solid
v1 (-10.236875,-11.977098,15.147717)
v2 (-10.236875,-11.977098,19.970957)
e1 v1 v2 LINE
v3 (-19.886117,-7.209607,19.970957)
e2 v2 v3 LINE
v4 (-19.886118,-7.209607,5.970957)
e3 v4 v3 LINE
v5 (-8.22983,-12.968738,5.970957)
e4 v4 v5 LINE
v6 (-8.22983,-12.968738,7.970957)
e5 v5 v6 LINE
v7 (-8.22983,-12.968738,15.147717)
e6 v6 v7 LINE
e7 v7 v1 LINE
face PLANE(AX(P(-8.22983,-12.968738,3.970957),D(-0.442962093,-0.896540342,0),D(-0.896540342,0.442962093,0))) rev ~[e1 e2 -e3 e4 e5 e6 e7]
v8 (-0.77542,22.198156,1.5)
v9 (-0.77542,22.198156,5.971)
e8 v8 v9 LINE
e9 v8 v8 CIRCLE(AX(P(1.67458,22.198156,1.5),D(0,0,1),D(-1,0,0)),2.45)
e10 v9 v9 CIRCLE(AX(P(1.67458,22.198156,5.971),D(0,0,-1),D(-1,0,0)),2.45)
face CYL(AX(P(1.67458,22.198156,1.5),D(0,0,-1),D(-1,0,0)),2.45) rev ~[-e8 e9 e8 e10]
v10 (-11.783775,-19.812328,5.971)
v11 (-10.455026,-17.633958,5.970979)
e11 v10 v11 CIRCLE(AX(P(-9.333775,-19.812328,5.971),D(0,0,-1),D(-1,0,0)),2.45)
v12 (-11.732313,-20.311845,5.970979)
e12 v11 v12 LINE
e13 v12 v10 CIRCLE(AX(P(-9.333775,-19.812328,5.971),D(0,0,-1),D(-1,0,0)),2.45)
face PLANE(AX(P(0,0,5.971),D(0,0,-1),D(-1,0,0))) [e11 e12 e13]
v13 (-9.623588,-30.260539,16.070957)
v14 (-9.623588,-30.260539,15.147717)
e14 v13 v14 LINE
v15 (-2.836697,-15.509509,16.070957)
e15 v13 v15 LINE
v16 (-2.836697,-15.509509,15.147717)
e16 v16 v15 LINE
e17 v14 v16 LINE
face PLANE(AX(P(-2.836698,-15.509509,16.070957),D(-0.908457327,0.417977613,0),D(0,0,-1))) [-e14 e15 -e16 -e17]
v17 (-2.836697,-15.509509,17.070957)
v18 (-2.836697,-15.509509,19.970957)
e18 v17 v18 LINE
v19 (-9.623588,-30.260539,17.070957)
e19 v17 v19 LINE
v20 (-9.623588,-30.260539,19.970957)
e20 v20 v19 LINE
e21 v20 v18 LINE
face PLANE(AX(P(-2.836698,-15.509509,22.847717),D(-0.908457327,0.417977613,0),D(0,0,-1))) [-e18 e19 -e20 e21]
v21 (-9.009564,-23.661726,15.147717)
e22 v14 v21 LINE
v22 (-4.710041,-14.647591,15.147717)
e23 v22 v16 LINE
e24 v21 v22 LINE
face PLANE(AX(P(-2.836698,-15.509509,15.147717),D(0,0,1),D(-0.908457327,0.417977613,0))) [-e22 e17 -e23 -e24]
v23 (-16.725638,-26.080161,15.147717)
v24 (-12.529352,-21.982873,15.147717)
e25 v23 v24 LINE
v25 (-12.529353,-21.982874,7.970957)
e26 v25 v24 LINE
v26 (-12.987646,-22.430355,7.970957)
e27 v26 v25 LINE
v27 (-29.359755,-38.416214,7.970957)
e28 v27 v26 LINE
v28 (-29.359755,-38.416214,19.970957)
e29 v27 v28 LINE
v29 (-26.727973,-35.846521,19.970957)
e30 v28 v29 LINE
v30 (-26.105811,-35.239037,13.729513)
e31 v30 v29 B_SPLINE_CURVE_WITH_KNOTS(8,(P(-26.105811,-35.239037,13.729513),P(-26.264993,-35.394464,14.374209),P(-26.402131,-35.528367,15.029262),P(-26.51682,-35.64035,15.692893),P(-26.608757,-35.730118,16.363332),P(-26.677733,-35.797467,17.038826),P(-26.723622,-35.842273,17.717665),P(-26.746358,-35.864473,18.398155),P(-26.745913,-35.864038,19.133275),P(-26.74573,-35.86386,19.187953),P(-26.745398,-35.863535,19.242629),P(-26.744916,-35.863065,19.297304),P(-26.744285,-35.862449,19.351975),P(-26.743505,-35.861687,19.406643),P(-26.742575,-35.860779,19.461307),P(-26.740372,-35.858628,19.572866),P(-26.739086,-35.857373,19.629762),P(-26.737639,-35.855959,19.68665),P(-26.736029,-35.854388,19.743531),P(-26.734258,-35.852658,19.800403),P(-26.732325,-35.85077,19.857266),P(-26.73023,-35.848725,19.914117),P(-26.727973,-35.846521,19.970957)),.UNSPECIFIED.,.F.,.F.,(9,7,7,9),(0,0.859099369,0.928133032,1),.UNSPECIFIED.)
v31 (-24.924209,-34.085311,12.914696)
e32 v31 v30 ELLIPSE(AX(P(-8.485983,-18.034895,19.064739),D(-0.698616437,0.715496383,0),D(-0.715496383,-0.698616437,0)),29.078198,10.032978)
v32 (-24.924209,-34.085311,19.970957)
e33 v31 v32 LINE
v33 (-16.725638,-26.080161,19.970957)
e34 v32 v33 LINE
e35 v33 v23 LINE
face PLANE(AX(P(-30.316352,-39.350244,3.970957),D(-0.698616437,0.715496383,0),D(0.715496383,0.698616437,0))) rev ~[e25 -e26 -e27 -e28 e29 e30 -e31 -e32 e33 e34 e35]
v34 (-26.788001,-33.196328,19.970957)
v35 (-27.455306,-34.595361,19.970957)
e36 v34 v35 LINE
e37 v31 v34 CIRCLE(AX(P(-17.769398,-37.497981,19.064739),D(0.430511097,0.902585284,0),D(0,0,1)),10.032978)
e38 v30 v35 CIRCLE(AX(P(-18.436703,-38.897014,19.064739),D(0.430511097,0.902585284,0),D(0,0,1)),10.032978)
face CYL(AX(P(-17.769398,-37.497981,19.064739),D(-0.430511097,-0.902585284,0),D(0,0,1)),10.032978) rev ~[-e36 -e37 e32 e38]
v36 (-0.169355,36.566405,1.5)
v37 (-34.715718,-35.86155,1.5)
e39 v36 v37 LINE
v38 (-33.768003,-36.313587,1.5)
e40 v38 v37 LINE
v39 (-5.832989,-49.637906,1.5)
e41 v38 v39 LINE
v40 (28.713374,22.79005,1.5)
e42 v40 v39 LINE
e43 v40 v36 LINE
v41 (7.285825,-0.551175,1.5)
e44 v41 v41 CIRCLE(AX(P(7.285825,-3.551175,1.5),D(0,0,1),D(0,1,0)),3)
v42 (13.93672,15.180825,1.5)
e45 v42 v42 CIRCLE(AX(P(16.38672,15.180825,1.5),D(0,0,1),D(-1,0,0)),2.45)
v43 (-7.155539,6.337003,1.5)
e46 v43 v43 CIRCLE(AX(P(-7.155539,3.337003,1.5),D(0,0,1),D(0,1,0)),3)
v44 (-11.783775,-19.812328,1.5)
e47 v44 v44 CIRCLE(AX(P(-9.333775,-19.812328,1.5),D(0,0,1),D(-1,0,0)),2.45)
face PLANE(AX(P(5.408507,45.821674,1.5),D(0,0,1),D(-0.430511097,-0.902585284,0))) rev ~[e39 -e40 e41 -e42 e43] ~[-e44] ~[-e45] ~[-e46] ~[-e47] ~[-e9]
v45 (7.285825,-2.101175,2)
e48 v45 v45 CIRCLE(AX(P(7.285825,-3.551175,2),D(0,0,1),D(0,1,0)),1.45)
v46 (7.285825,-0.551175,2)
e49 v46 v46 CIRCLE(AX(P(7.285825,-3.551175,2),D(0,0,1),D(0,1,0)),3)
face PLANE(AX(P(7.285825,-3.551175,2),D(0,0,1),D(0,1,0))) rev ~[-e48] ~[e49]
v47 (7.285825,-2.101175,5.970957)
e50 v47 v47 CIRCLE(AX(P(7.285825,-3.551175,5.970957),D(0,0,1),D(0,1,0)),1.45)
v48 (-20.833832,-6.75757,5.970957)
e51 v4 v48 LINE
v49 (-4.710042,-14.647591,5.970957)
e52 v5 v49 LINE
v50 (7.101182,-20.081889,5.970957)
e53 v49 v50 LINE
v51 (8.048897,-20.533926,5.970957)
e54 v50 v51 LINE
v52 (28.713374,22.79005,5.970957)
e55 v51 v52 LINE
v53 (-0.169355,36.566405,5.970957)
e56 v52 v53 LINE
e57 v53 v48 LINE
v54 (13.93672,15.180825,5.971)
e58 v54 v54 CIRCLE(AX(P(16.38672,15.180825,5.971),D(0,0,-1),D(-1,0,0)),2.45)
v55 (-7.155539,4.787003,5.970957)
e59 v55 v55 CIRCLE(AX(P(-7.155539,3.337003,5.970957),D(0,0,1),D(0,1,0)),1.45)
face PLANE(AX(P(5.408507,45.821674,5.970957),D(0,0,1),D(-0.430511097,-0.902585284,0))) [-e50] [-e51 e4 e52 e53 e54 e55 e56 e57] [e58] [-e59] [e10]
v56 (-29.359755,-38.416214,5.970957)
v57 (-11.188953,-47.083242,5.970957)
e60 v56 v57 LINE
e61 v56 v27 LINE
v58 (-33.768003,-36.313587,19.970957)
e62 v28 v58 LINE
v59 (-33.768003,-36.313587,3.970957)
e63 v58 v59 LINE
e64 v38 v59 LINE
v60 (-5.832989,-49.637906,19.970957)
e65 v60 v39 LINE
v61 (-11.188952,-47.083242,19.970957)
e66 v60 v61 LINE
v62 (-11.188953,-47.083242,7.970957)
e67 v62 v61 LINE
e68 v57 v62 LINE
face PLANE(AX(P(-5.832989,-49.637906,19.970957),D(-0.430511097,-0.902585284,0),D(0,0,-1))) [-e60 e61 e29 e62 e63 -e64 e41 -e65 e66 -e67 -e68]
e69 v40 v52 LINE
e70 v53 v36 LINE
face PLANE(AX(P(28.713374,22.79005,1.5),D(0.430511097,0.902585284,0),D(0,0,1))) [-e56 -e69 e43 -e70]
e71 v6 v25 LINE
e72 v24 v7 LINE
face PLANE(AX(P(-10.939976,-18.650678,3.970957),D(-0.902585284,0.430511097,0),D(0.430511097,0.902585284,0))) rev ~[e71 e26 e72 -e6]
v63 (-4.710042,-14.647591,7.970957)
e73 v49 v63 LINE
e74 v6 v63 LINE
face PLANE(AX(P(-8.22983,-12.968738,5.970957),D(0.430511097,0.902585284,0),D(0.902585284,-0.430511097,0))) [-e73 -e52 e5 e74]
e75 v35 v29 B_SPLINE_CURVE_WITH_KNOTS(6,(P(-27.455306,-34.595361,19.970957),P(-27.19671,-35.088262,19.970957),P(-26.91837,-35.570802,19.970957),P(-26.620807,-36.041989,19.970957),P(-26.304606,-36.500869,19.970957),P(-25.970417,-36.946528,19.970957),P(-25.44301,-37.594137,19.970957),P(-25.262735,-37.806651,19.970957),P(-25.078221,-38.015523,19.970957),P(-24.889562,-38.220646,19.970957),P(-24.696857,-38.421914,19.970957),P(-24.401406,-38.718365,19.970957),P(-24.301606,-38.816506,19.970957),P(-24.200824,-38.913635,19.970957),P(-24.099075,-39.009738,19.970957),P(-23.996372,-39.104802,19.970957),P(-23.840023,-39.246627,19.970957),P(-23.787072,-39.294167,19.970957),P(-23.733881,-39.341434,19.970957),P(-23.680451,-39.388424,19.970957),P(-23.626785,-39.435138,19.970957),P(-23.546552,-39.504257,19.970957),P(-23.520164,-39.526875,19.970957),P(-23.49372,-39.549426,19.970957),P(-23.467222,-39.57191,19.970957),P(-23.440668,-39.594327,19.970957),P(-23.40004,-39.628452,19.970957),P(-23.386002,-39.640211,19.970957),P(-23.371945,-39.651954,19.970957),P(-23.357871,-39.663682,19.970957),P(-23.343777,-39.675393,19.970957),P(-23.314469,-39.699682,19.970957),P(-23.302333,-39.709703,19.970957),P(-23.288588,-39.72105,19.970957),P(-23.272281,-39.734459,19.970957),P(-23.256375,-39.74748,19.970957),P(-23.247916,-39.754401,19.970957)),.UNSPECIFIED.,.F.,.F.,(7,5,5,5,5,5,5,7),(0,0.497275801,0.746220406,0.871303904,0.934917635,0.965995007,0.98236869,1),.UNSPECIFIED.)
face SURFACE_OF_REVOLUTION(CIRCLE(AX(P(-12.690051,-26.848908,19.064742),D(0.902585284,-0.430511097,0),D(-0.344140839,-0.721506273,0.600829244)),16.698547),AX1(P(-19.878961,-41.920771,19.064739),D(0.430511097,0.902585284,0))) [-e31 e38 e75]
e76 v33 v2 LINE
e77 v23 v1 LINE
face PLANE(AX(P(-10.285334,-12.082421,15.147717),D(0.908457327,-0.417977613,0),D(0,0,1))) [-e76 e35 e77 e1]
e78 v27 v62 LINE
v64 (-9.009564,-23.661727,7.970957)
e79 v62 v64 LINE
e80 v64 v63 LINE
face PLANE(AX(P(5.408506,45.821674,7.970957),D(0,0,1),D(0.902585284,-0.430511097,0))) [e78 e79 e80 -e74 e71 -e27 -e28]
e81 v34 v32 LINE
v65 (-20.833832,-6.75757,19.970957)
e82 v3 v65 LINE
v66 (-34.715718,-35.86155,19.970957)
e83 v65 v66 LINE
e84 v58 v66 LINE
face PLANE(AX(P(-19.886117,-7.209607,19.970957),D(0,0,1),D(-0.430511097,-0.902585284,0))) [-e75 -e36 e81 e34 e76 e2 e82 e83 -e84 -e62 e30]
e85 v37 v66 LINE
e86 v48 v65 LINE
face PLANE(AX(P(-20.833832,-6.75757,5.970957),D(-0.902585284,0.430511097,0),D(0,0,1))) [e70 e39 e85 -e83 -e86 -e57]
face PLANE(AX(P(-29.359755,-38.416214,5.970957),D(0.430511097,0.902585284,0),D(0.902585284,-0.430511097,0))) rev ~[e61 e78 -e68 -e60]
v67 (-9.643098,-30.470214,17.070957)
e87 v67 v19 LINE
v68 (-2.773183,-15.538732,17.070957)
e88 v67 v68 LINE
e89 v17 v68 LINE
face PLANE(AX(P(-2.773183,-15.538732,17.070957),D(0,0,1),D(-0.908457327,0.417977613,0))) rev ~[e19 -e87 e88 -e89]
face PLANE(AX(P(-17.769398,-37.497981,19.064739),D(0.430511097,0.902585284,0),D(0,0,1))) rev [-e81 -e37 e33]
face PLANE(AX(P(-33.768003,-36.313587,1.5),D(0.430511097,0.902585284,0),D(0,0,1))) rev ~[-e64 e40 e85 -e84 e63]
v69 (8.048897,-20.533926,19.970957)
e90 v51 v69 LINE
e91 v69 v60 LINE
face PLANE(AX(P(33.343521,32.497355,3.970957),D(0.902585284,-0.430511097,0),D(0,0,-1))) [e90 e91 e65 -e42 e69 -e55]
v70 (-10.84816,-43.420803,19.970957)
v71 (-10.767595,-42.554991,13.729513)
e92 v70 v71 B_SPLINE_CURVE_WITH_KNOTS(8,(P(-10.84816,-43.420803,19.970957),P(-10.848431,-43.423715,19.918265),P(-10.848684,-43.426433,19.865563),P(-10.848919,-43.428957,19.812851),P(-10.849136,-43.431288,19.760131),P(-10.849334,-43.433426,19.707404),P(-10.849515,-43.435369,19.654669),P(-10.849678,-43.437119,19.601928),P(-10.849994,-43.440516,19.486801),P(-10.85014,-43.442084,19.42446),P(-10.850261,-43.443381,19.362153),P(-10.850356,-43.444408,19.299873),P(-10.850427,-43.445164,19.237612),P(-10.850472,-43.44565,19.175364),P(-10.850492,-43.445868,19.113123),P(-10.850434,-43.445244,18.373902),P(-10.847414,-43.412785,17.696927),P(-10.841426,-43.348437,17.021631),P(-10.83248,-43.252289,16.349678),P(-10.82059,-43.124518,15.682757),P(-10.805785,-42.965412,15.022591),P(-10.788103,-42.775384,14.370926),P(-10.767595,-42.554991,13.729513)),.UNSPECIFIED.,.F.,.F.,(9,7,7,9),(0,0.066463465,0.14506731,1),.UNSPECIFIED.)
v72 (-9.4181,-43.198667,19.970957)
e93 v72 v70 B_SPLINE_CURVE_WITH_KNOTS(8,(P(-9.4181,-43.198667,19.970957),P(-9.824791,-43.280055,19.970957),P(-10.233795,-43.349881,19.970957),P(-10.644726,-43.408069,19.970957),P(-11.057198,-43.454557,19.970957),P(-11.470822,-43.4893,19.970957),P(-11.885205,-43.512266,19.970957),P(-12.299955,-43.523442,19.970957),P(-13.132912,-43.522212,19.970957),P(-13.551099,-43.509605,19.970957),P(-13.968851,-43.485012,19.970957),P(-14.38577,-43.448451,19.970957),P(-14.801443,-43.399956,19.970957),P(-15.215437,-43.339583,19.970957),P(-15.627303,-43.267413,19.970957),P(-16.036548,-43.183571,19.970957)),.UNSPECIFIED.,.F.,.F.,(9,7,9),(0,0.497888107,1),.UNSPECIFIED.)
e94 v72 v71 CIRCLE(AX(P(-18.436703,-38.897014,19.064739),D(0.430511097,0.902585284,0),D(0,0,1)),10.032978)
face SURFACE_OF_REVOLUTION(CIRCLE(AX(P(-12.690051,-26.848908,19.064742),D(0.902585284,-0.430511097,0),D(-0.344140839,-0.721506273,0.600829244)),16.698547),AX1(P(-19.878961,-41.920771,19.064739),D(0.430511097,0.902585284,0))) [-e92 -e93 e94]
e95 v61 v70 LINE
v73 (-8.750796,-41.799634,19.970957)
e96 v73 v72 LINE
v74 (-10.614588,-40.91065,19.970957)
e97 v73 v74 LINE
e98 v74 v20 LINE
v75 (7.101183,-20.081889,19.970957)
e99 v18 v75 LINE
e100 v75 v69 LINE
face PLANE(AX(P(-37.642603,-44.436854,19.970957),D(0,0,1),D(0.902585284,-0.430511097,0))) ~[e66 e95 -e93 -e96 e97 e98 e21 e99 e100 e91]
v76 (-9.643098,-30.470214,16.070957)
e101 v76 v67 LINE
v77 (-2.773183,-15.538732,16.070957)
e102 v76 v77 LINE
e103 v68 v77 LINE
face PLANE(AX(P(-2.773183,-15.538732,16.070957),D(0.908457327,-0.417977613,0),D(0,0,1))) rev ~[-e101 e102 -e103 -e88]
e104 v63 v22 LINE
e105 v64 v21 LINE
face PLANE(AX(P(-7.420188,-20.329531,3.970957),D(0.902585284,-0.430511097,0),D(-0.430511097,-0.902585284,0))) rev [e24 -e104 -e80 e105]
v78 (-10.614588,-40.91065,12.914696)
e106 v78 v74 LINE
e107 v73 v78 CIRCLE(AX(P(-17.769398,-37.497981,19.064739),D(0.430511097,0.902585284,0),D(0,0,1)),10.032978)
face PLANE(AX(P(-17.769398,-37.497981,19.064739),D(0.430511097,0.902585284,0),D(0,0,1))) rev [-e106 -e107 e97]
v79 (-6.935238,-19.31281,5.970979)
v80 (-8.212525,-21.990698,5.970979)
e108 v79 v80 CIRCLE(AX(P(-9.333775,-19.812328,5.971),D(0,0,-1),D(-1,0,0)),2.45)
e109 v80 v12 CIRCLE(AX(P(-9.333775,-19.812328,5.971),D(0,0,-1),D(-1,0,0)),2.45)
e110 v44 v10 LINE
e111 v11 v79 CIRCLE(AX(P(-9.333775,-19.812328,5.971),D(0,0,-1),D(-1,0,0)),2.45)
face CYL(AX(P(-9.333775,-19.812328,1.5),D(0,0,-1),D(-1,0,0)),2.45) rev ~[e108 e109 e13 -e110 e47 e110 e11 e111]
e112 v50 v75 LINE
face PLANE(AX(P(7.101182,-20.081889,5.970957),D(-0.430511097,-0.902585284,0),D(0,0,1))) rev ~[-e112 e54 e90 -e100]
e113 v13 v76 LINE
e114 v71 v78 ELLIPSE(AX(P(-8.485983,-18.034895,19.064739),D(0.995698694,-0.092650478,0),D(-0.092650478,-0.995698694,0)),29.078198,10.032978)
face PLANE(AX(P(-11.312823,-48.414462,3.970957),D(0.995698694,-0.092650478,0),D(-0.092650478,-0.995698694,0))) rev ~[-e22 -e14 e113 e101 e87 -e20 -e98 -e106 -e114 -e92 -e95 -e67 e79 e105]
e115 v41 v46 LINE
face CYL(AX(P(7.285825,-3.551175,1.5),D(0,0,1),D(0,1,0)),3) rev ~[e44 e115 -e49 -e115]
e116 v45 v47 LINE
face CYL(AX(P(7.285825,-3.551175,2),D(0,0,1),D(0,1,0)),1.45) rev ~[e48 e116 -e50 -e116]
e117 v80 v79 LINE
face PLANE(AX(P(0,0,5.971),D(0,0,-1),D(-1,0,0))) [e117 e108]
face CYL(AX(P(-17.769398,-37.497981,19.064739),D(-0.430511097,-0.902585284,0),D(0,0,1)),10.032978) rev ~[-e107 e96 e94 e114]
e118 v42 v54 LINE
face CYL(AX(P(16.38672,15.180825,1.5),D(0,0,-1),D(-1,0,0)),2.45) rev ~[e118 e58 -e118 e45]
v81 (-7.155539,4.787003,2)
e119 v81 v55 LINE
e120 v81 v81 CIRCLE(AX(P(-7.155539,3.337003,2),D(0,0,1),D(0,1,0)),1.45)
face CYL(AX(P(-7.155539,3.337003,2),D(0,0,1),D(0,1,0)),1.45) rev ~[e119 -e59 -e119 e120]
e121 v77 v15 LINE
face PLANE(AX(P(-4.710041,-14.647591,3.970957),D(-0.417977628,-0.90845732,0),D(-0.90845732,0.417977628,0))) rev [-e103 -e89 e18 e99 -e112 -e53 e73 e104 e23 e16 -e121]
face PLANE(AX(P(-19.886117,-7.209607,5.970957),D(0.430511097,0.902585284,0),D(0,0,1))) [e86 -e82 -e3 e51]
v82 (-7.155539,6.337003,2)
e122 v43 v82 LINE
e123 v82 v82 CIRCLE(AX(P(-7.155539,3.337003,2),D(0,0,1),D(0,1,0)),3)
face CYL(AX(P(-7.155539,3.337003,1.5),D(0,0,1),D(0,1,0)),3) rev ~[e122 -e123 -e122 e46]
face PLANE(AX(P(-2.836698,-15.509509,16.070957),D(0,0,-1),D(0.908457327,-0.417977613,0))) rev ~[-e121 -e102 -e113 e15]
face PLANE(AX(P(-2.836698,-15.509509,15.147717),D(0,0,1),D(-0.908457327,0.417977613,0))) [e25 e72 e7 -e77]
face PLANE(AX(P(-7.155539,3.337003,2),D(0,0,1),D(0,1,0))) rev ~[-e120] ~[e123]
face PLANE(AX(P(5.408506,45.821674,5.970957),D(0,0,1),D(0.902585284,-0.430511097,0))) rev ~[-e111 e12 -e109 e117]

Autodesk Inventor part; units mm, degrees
ref_plane "YZ Plane" through (0, 0, 0) normal (1, 0, 0) x (0, 1, 0)
ref_plane "XZ Plane" through (0, 0, 0) normal (0, 1, 0) x (-1, 0, 0)
ref_plane "Work Plane1" through (0, 0, 1.5) normal (0, 0, 1) x (1, 0, 0)
sketch "Sketch1" plane through (0, 0, 1.5) normal (0, 0, 1) x (1, 0, 0)
  line L0 (8.75354, 57.756452) -> (7.809034, 57.756452) construction
  line L1 (-24.776894, -15.05709) -> (8.75354, 57.756452) construction
  line L2 (-24.776894, -52.66184) -> (-24.776894, -15.05709) construction
  line L3 (-18.707308, -55.556884) -> (-24.776894, -52.66184) construction
  line L4 (-18.707308, -40.563421) -> (-18.707308, -55.556884) construction
  line L5 (0.391621, -40.563421) -> (-18.707308, -40.563421) construction
  line L6 (23.692692, 8.28829) -> (0.391621, -40.563421) construction
  line L7 (23.692692, 53.178978) -> (23.692692, 8.28829) construction
  line L8 (8.974225, 60.199326) -> (23.692692, 53.178978) construction
  line L9 (7.809034, 57.756452) -> (8.974225, 60.199326) construction
  circle A0 centre (-21.307308, -37.886297) radius 1.6 construction
  circle A1 centre (-21.307308, -27.886297) radius 1.6 construction
  line L10 (11.632256, -10.582296) -> (32.395806, 32.949392)
  line L11 (-15.355044, 2.289986) -> (5.408506, 45.821674)
  line L12 (5.408506, 45.821674) -> (32.395806, 32.949392)
  line L13 (32.395806, 32.949392) -> (-10.655303, -57.309136)
  line L14 (-10.655303, -57.309136) -> (-37.642603, -44.436855)
  line L15 (-37.642603, -44.436855) -> (5.408506, 45.821674)
  circle A2 centre (11.737087, 5.432666) radius 3
  circle A3 centre (-13.983408, -29.560487) radius 3
  circle A4 centre (-2.975053, 12.449997) radius 3
  point P0 (0, 0)
  dimension "d1" = 100
ref_plane "Work Plane2" through (4.456703, -9.721274, 3.970957) normal (0, 0, -1) x (0.4305111, 0.9025853, 0)
ref_plane "Work Plane6" through (4.456703, -9.721274, 2.470957) normal (0, 0, -1) x (0.4305111, 0.9025853, 0)
extrude "Extrusion1" add sketch "Sketch1" along normal up to surface (2.470957 mm away) contours L13 L14 L15 L11 L12 L10 | A2 | A3 | A4
sketch "Sketch2" plane through (-10.655303, -57.309136, 3.970957) normal (0, 0, 1) x (0.9025853, -0.4305111, 0)
  line L0 (0, 0) -> (0, 100)
  line L1 (0, 100) -> (-29.9, 100)
  line L2 (-29.9, 100) -> (-29.9, 0)
  line L3 (-29.9, 0) -> (0, 0)
  line L4 (-21.95, 51.77) -> (-27.9, 51.77)
  line L5 (-2, 51.77) -> (-7.95, 51.77)
  line L6 (-19.05, 34.77) -> (-10.85, 34.77)
  arc A0 (-27.45, 2.77) -> (-2.45, 2.77) centre (-14.95, 20.30125) ccw construction
  arc A1 (-2.45, 4.77) -> (-27.45, 4.77) centre (-14.95, -12.76125) ccw construction
  line L7 (-27.45, 2.77) -> (-27.45, 4.77) construction
  line L8 (-2.45, 2.77) -> (-2.45, 4.77) construction
  line L9 (-29.9, 0) -> (0, 0)
  line L10 (-25.477276, 0) -> (-25.477276, 7.745132)
  line L11 (-25.477276, 7.745132) -> (-16.899837, 31.078166)
  line L12 (-16.899837, 31.078166) -> (-16.899837, 41.065184)
  line L13 (-16.899837, 41.065184) -> (-29.9, 41.24513)
  line L14 (-29.9, 100) -> (-29.9, 0)
  line L15 (-29.9, 0) -> (-29.9, 41.24513)
  line L16 (-14.95, 0) -> (-14.95, 40.435372) construction
  line L17 (-2.45, 2.77) -> (-2.45, 4.77) construction
  line L18 (-4.422724, 0) -> (-4.422724, 7.745132)
  line L19 (-4.422724, 7.745132) -> (-13.000163, 31.078166)
  line L20 (-13.000163, 31.078166) -> (-13.000163, 41.065184)
  line L21 (-13.000163, 41.065184) -> (0, 41.24513)
  line L22 (0, 0) -> (0, 41.24513)
  line L23 (0, 0) -> (0, 100) construction
  line L24 (0, 41.24513) -> (0, 0) construction
  line L25 (0, 0) -> (-4.422724, 0) construction
  point P0 (-15.054899, 56.31361)
extrude "Extrusion2" add sketch "Sketch2" along normal blind 16 contours L3 L2 L13 L12 L11 L10
ref_plane "Work Plane3" through (-24.148953, -50.872995, 3.970957) normal (0.9025853, -0.4305111, 0) x (0, 0, -1)
mirror "Mirror1" about plane through (-24.148953, -50.872995, 3.970957) normal (0.9025853, -0.4305111, 0) of "Extrusion2"
sketch "Sketch3" plane through (-4.710042, -14.647591, 19.970957) normal (0.4179776, 0.9084573, 0) x (0.9084573, -0.4179776, 0)
  ellipse E0 centre (-1.967577, -0.95) end of major axis (-1.967577, 1.897221) minor radius 2.846948 construction
  line L0 (2.132031, -4.8) -> (2.132031, 2.9) construction
  line L1 (2.132031, 2.9) -> (-6.067184, 2.9) construction
  line L2 (-6.067184, 2.9) -> (-6.067184, -4.8) construction
  line L3 (-6.067184, -4.8) -> (2.132031, -4.8) construction
  line L4 (2.132031, -4.8) -> (2.132031, 2.9)
  line L5 (2.132031, 2.9) -> (-6.067184, 2.9)
  line L6 (-6.067184, 2.9) -> (-6.067184, -4.8)
  line L7 (-6.067184, -4.8) -> (2.132031, -4.8)
  line L8 (2.132031, 2.9) -> (-6.067184, 2.9)
  line L9 (-6.067184, 2.9) -> (-6.067184, 3.9)
  line L10 (-6.067184, 3.9) -> (2.132031, 3.9)
  line L11 (2.132031, 3.9) -> (2.132031, 2.9)
  ellipse E1 centre (-2.037491, 0.97324) end of major axis (-2.037491, 3.820462) minor radius 2.846948
  line L12 (2.062116, -2.87676) -> (2.062116, 4.82324)
  line L13 (-6.137098, -2.87676) -> (2.062116, -2.87676)
  line L14 (-6.137098, 4.82324) -> (-6.137098, -2.87676)
  line L15 (2.062116, 4.82324) -> (-6.137098, 4.82324)
  point P0 (-1.843493, 19.970957)
  dimension "d6" = 0
  dimension "d40" = 1
extrude "Extrusion3" cut sketch "Sketch3" along normal through all both and the other way through all contours L5 L12 L10 L11 | L12 L13 L6 L5 E1 | L5 E1 L9 L10 L12 | L13 L14 L15 L12 L10 L9 L6 | E1 L5 | L5 E1
sketch "Sketch4" plane through (-24.148953, -50.872995, 3.970957) normal (0.9025853, -0.4305111, 0) x (0, 0, -1)
  arc A0 (-27.45, 2.77) -> (-2.45, 2.77) centre (-14.95, 20.30125) ccw
  line L0 (-27.45, 2.77) -> (-27.45, 4.77)
  arc A1 (-2.45, 4.77) -> (-27.45, 4.77) centre (-14.95, -12.76125) ccw
  arc A2 (-2.475103, 4.91042) -> (-27.55, 4.82144) centre (-14.95, -12.76125) ccw
  line L1 (-27.55, 4.82144) -> (-27.55, 2.71856)
  arc A3 (-27.55, 2.71856) -> (-2.475103, 2.62958) centre (-14.95, 20.30125) ccw
  line L2 (-15.02676, 8.869864) -> (-15.02676, -1.329864)
  point P0 (3.970957, 56.31361)
  dimension "d9" = 0.1
revolve "Revolution1" cut sketch "Sketch4" angle 360 about axis through (-20.330379, -42.867187, 18.997716) along (-0.4305111, -0.9025853, 0)
sketch "Sketch5" plane through (0, 0, 1.5) normal (0, 0, -1) x (-1, 0, 0)
  circle A0 centre (-11.737087, 5.432666) radius 3 construction
  circle A1 centre (2.975053, 12.449997) radius 3 construction
  point P0 (0, 0)
sketch "Sketch6" plane through (0, 0, 1.5) normal (0, 0, -1) x (-1, 0, 0)
  line L0 (-4.381017, 8.941331) -> (-7.825106, 16.162014)
  line L1 (-8.686128, 17.967184) -> (-12.130217, 25.187866)
  circle A0 centre (10.53932, -22.339805) radius 2.45
  circle A1 centre (-15.181176, 12.653348) radius 2.45
  circle A2 centre (-0.469036, 19.670679) radius 2.45
  circle A3 centre (-7.285825, -3.551175) radius 1.45
  circle A4 centre (7.155539, 3.337003) radius 1.45
  line L2 (-32.395806, 32.949392) -> (-5.408506, 45.821674)
  line L3 (10.655303, -57.309136) -> (-32.395806, 32.949392)
  point P0 (0, 0)
  dimension "d48" = 8
  dimension "d51" = 4.9
  dimension "d54" = 4.9
  dimension "d55" = 4.9
  dimension "d56" = 2.9
  dimension "d57" = 2.9
  dimension "d83" = 43.755
  dimension "d84" = 43.755
  dimension "d85" = 13.1
  dimension "d86" = 6.95
sketch "Sketch7" plane through (5.408506, 45.821674, 3.970957) normal (0, 0, 1) x (0.9025853, -0.4305111, 0)
  line L0 (25.477276, -100) -> (25.477276, -92.254868)
  line L1 (25.477276, -92.254868) -> (16.899837, -68.921834)
  line L2 (16.899837, -68.921834) -> (16.899837, -58.934816)
  line L3 (16.899837, -58.934816) -> (29.9, -58.75487)
  line L4 (29.9, -58.75487) -> (29.9, 0)
  line L5 (29.9, 0) -> (0, 0)
  line L6 (0, 0) -> (0, -58.75487)
  line L7 (0, -58.75487) -> (13.000163, -58.934816)
  line L8 (13.000163, -58.934816) -> (13.000163, -68.921834)
  line L9 (13.000163, -68.921834) -> (4.422724, -92.254868)
  line L10 (4.422724, -92.254868) -> (4.422724, -100)
  line L11 (4.422724, -100) -> (25.477276, -100)
  line L12 (13.000163, -58.934816) -> (13.000163, -68.921834)
  line L13 (13.000163, -58.934816) -> (16.899837, -58.934816)
  point P0 (14.845101, -43.68639)
extrude "Extrusion5" add sketch "Sketch7" along normal blind 2
sketch "Sketch8" plane through (32.395806, 32.949392, 3.970957) normal (0.9025853, -0.4305111, 0) x (0, 0, -1)
  line L0 (2.470957, -100) -> (-16, -100)
  line L1 (2.470957, -100) -> (2.470957, 0)
  line L2 (-2, -58.75487) -> (-16, -58.75487)
  line L3 (-16, -58.75487) -> (-16, -100)
  line L4 (-16, -100) -> (2.470957, -100)
  line L5 (2.470957, -100) -> (2.470957, 0)
  line L6 (2.470957, 0) -> (-16, 0)
  line L7 (-16, 0) -> (-16, -100)
  line L8 (2.470957, 0) -> (-2, 0)
  line L9 (-2, -58.75487) -> (-2, 0)
  line L10 (-16, -58.75487) -> (2.470957, -58.75487)
  line L11 (2.470957, -100) -> (2.470957, 0)
  point P0 (3.970957, -43.68639)
extrude "Extrusion7" add sketch "Sketch8" along normal blind 1.05 contours L0 L3 L2 L10 L1 | L10 L9 L6 L1
ref_plane "Work Plane4" through (-74.107308, 67.113703, 4) normal (0, 1, 0) x (1, 0, 0)
sketch "Sketch10" plane through (-74.107308, 67.113703, 4) normal (0, 1, 0) x (1, 0, 0)
  circle A0 centre (-42.022145, 16.72324) radius 3
  circle A1 centre (-42.022145, 16.72324) radius 4.301236
  point P0 (74.107308, 4)
extrude "Extrusion9" cut sketch "Sketch10" against normal through all contours A0 | A1
ref_plane "Work Plane5" through (0, 0, 0) normal (0, 0, -1) x (-1, 0, 0)
sketch "Sketch12" plane through (-24.148953, -50.872995, 3.970957) normal (0.9025853, -0.4305111, 0) x (0, 0, -1)
  line L0 (-25.02676, 14.71856) -> (-5.02676, 14.71856)
  line L1 (-25.02676, 14.71856) -> (-25.02676, 13.31856)
  arc A0 (-25.02676, 13.31856) -> (-15.093782, 10.018425) centre (-15.093782, 26.616977) ccw
  line L2 (-5.02676, 14.81856) -> (-25.12676, 14.81856)
  line L3 (-25.12676, 14.81856) -> (-25.12676, 13.268531)
  arc A1 (-25.12676, 13.268531) -> (-15.093782, 9.918425) centre (-15.093782, 26.616977) ccw
  line L4 (-15.093782, 9.918425) -> (-15.093782, 14.81856)
  line L5 (-15.093782, 9.918425) -> (-10.193647, 9.918425) construction
  point P0 (3.970957, 56.31361)
  dimension "d41" = 0.1
  dimension "d42" = 90
revolve "Revolution2" cut sketch "Sketch12" angle 360 about axis through (-19.878961, -41.920771, 19.064739) along (0.4305111, 0.9025853, 0)
sketch "Sketch13" plane through (33.343521, 32.497355, 3.970957) normal (0.9025853, -0.4305111, 0) x (0, 0, -1)
  line L0 (2.470957, -100) -> (-16, -100)
  line L1 (-16, 0) -> (-16, -100)
  line L2 (3.970957, -100) -> (-16, -100)
  line L3 (-16, -100) -> (-16, -91)
  line L4 (-16, -91) -> (3.970957, -91)
  line L5 (3.970957, -91) -> (3.970957, -100)
  point P0 (3.970957, -43.68639)
  dimension "d44" = 9
extrude "Extrusion10" cut sketch "Sketch13" against normal through all
hole "Hole3" at (7.285825, -3.551175, 1.5) at (-7.155539, 3.337003, 1.5) direction (0, 0, 1) diameter 2.9 end through all counterbore diameter 6 counterbore depth 0.5
sketch "Sketch14" plane through (0, 0, 1.5) normal (0, 0, -1) x (-1, 0, 0)
  circle A0 centre (9.333775, -19.812328) radius 2.45
  circle A1 centre (-16.38672, 15.180825) radius 2.45
  circle A2 centre (-1.67458, 22.198156) radius 2.45
  circle A3 centre (-19.486287, 21.679201) radius 1.45
  circle A4 centre (-4.774147, 28.696532) radius 1.45
  line L0 (29.359754, -38.416214) -> (11.188953, -47.083242)
  line L1 (20.274354, -42.749728) -> (9.333775, -19.812328)
  line L2 (-7.825106, 16.162014) -> (-8.600026, 17.786667)
  line L3 (-15.956209, 14.27824) -> (-1.243956, 21.295333)
  point P0 (0, 0)
  point P1 (0, 0)
  dimension "d73" = 4.9
  dimension "d74" = 4.9
  dimension "d75" = 4.9
  dimension "d76" = 2.9
  dimension "d77" = 2.9
  dimension "d94" = 25.413
  dimension "d95" = 1.8
extrude "Extrusion11" cut sketch "Sketch14" against normal blind 4.471 contours A0 | A1 | A2
sketch "Sketch15" plane through (5.408506, 45.821674, 5.970957) normal (0, 0, 1) x (0.9025853, -0.4305111, 0)
  line L0 (13.000163, -58.934816) -> (13.000163, -68.921834)
  line L1 (4.884025, -91) -> (25.015975, -91)
  line L2 (16.899837, -68.921834) -> (25.015975, -91)
  line L3 (12.77916, -69.523024) -> (13.000163, -68.921834)
  line L4 (4.884025, -91) -> (13.000163, -68.921834)
  line L5 (29.9, -58.75487) -> (16.899837, -58.934816)
  line L6 (13.000163, -58.934816) -> (16.899837, -58.934816)
  line L7 (16.899837, -68.921834) -> (16.899837, -58.934816)
  line L8 (17.12084, -69.523024) -> (16.899837, -68.921834)
  point P0 (14.845101, -43.68639)
extrude "Extrusion12" add sketch "Sketch15" along normal blind 2
sketch "Sketch16" plane through (-19.886117, -7.209607, 5.970957) normal (-0.9025853, 0.4305111, 0) x (0, 0, 1)
  line L0 (-4.470957, -32.24513) -> (14, -32.24513)
  line L1 (14, 0) -> (14, -32.24513)
  line L2 (0, 0) -> (14, 0)
  line L3 (0, 58.75487) -> (0, 0)
  line L4 (-4.470957, 58.75487) -> (0, 58.75487)
  line L5 (-4.470957, 58.75487) -> (-4.470957, -32.24513)
  point P0 (-5.970957, 15.068479)
extrude "Extrusion13" add sketch "Sketch16" along normal blind 1.05
sketch "Sketch17" plane through (33.343521, 32.497355, 3.970957) normal (0.9025853, -0.4305111, 0) x (0, 0, -1)
  line L0 (2.470957, 0) -> (-2, 0)
  line L1 (2.470957, 0) -> (2.470957, -91)
  line L2 (-2, 0) -> (2.470957, 0)
  line L3 (2.470957, 0) -> (2.470957, -10.755)
  line L4 (2.470957, -10.755) -> (-2, -10.755)
  line L5 (-2, -10.755) -> (-2, 0)
  point P0 (3.970957, -43.68639)
  dimension "d89" = 10.755
extrude "Extrusion14" cut sketch "Sketch17" against normal through all
properties part number "30_CUBE_openSIM_Laser_Telescope_Mount"
